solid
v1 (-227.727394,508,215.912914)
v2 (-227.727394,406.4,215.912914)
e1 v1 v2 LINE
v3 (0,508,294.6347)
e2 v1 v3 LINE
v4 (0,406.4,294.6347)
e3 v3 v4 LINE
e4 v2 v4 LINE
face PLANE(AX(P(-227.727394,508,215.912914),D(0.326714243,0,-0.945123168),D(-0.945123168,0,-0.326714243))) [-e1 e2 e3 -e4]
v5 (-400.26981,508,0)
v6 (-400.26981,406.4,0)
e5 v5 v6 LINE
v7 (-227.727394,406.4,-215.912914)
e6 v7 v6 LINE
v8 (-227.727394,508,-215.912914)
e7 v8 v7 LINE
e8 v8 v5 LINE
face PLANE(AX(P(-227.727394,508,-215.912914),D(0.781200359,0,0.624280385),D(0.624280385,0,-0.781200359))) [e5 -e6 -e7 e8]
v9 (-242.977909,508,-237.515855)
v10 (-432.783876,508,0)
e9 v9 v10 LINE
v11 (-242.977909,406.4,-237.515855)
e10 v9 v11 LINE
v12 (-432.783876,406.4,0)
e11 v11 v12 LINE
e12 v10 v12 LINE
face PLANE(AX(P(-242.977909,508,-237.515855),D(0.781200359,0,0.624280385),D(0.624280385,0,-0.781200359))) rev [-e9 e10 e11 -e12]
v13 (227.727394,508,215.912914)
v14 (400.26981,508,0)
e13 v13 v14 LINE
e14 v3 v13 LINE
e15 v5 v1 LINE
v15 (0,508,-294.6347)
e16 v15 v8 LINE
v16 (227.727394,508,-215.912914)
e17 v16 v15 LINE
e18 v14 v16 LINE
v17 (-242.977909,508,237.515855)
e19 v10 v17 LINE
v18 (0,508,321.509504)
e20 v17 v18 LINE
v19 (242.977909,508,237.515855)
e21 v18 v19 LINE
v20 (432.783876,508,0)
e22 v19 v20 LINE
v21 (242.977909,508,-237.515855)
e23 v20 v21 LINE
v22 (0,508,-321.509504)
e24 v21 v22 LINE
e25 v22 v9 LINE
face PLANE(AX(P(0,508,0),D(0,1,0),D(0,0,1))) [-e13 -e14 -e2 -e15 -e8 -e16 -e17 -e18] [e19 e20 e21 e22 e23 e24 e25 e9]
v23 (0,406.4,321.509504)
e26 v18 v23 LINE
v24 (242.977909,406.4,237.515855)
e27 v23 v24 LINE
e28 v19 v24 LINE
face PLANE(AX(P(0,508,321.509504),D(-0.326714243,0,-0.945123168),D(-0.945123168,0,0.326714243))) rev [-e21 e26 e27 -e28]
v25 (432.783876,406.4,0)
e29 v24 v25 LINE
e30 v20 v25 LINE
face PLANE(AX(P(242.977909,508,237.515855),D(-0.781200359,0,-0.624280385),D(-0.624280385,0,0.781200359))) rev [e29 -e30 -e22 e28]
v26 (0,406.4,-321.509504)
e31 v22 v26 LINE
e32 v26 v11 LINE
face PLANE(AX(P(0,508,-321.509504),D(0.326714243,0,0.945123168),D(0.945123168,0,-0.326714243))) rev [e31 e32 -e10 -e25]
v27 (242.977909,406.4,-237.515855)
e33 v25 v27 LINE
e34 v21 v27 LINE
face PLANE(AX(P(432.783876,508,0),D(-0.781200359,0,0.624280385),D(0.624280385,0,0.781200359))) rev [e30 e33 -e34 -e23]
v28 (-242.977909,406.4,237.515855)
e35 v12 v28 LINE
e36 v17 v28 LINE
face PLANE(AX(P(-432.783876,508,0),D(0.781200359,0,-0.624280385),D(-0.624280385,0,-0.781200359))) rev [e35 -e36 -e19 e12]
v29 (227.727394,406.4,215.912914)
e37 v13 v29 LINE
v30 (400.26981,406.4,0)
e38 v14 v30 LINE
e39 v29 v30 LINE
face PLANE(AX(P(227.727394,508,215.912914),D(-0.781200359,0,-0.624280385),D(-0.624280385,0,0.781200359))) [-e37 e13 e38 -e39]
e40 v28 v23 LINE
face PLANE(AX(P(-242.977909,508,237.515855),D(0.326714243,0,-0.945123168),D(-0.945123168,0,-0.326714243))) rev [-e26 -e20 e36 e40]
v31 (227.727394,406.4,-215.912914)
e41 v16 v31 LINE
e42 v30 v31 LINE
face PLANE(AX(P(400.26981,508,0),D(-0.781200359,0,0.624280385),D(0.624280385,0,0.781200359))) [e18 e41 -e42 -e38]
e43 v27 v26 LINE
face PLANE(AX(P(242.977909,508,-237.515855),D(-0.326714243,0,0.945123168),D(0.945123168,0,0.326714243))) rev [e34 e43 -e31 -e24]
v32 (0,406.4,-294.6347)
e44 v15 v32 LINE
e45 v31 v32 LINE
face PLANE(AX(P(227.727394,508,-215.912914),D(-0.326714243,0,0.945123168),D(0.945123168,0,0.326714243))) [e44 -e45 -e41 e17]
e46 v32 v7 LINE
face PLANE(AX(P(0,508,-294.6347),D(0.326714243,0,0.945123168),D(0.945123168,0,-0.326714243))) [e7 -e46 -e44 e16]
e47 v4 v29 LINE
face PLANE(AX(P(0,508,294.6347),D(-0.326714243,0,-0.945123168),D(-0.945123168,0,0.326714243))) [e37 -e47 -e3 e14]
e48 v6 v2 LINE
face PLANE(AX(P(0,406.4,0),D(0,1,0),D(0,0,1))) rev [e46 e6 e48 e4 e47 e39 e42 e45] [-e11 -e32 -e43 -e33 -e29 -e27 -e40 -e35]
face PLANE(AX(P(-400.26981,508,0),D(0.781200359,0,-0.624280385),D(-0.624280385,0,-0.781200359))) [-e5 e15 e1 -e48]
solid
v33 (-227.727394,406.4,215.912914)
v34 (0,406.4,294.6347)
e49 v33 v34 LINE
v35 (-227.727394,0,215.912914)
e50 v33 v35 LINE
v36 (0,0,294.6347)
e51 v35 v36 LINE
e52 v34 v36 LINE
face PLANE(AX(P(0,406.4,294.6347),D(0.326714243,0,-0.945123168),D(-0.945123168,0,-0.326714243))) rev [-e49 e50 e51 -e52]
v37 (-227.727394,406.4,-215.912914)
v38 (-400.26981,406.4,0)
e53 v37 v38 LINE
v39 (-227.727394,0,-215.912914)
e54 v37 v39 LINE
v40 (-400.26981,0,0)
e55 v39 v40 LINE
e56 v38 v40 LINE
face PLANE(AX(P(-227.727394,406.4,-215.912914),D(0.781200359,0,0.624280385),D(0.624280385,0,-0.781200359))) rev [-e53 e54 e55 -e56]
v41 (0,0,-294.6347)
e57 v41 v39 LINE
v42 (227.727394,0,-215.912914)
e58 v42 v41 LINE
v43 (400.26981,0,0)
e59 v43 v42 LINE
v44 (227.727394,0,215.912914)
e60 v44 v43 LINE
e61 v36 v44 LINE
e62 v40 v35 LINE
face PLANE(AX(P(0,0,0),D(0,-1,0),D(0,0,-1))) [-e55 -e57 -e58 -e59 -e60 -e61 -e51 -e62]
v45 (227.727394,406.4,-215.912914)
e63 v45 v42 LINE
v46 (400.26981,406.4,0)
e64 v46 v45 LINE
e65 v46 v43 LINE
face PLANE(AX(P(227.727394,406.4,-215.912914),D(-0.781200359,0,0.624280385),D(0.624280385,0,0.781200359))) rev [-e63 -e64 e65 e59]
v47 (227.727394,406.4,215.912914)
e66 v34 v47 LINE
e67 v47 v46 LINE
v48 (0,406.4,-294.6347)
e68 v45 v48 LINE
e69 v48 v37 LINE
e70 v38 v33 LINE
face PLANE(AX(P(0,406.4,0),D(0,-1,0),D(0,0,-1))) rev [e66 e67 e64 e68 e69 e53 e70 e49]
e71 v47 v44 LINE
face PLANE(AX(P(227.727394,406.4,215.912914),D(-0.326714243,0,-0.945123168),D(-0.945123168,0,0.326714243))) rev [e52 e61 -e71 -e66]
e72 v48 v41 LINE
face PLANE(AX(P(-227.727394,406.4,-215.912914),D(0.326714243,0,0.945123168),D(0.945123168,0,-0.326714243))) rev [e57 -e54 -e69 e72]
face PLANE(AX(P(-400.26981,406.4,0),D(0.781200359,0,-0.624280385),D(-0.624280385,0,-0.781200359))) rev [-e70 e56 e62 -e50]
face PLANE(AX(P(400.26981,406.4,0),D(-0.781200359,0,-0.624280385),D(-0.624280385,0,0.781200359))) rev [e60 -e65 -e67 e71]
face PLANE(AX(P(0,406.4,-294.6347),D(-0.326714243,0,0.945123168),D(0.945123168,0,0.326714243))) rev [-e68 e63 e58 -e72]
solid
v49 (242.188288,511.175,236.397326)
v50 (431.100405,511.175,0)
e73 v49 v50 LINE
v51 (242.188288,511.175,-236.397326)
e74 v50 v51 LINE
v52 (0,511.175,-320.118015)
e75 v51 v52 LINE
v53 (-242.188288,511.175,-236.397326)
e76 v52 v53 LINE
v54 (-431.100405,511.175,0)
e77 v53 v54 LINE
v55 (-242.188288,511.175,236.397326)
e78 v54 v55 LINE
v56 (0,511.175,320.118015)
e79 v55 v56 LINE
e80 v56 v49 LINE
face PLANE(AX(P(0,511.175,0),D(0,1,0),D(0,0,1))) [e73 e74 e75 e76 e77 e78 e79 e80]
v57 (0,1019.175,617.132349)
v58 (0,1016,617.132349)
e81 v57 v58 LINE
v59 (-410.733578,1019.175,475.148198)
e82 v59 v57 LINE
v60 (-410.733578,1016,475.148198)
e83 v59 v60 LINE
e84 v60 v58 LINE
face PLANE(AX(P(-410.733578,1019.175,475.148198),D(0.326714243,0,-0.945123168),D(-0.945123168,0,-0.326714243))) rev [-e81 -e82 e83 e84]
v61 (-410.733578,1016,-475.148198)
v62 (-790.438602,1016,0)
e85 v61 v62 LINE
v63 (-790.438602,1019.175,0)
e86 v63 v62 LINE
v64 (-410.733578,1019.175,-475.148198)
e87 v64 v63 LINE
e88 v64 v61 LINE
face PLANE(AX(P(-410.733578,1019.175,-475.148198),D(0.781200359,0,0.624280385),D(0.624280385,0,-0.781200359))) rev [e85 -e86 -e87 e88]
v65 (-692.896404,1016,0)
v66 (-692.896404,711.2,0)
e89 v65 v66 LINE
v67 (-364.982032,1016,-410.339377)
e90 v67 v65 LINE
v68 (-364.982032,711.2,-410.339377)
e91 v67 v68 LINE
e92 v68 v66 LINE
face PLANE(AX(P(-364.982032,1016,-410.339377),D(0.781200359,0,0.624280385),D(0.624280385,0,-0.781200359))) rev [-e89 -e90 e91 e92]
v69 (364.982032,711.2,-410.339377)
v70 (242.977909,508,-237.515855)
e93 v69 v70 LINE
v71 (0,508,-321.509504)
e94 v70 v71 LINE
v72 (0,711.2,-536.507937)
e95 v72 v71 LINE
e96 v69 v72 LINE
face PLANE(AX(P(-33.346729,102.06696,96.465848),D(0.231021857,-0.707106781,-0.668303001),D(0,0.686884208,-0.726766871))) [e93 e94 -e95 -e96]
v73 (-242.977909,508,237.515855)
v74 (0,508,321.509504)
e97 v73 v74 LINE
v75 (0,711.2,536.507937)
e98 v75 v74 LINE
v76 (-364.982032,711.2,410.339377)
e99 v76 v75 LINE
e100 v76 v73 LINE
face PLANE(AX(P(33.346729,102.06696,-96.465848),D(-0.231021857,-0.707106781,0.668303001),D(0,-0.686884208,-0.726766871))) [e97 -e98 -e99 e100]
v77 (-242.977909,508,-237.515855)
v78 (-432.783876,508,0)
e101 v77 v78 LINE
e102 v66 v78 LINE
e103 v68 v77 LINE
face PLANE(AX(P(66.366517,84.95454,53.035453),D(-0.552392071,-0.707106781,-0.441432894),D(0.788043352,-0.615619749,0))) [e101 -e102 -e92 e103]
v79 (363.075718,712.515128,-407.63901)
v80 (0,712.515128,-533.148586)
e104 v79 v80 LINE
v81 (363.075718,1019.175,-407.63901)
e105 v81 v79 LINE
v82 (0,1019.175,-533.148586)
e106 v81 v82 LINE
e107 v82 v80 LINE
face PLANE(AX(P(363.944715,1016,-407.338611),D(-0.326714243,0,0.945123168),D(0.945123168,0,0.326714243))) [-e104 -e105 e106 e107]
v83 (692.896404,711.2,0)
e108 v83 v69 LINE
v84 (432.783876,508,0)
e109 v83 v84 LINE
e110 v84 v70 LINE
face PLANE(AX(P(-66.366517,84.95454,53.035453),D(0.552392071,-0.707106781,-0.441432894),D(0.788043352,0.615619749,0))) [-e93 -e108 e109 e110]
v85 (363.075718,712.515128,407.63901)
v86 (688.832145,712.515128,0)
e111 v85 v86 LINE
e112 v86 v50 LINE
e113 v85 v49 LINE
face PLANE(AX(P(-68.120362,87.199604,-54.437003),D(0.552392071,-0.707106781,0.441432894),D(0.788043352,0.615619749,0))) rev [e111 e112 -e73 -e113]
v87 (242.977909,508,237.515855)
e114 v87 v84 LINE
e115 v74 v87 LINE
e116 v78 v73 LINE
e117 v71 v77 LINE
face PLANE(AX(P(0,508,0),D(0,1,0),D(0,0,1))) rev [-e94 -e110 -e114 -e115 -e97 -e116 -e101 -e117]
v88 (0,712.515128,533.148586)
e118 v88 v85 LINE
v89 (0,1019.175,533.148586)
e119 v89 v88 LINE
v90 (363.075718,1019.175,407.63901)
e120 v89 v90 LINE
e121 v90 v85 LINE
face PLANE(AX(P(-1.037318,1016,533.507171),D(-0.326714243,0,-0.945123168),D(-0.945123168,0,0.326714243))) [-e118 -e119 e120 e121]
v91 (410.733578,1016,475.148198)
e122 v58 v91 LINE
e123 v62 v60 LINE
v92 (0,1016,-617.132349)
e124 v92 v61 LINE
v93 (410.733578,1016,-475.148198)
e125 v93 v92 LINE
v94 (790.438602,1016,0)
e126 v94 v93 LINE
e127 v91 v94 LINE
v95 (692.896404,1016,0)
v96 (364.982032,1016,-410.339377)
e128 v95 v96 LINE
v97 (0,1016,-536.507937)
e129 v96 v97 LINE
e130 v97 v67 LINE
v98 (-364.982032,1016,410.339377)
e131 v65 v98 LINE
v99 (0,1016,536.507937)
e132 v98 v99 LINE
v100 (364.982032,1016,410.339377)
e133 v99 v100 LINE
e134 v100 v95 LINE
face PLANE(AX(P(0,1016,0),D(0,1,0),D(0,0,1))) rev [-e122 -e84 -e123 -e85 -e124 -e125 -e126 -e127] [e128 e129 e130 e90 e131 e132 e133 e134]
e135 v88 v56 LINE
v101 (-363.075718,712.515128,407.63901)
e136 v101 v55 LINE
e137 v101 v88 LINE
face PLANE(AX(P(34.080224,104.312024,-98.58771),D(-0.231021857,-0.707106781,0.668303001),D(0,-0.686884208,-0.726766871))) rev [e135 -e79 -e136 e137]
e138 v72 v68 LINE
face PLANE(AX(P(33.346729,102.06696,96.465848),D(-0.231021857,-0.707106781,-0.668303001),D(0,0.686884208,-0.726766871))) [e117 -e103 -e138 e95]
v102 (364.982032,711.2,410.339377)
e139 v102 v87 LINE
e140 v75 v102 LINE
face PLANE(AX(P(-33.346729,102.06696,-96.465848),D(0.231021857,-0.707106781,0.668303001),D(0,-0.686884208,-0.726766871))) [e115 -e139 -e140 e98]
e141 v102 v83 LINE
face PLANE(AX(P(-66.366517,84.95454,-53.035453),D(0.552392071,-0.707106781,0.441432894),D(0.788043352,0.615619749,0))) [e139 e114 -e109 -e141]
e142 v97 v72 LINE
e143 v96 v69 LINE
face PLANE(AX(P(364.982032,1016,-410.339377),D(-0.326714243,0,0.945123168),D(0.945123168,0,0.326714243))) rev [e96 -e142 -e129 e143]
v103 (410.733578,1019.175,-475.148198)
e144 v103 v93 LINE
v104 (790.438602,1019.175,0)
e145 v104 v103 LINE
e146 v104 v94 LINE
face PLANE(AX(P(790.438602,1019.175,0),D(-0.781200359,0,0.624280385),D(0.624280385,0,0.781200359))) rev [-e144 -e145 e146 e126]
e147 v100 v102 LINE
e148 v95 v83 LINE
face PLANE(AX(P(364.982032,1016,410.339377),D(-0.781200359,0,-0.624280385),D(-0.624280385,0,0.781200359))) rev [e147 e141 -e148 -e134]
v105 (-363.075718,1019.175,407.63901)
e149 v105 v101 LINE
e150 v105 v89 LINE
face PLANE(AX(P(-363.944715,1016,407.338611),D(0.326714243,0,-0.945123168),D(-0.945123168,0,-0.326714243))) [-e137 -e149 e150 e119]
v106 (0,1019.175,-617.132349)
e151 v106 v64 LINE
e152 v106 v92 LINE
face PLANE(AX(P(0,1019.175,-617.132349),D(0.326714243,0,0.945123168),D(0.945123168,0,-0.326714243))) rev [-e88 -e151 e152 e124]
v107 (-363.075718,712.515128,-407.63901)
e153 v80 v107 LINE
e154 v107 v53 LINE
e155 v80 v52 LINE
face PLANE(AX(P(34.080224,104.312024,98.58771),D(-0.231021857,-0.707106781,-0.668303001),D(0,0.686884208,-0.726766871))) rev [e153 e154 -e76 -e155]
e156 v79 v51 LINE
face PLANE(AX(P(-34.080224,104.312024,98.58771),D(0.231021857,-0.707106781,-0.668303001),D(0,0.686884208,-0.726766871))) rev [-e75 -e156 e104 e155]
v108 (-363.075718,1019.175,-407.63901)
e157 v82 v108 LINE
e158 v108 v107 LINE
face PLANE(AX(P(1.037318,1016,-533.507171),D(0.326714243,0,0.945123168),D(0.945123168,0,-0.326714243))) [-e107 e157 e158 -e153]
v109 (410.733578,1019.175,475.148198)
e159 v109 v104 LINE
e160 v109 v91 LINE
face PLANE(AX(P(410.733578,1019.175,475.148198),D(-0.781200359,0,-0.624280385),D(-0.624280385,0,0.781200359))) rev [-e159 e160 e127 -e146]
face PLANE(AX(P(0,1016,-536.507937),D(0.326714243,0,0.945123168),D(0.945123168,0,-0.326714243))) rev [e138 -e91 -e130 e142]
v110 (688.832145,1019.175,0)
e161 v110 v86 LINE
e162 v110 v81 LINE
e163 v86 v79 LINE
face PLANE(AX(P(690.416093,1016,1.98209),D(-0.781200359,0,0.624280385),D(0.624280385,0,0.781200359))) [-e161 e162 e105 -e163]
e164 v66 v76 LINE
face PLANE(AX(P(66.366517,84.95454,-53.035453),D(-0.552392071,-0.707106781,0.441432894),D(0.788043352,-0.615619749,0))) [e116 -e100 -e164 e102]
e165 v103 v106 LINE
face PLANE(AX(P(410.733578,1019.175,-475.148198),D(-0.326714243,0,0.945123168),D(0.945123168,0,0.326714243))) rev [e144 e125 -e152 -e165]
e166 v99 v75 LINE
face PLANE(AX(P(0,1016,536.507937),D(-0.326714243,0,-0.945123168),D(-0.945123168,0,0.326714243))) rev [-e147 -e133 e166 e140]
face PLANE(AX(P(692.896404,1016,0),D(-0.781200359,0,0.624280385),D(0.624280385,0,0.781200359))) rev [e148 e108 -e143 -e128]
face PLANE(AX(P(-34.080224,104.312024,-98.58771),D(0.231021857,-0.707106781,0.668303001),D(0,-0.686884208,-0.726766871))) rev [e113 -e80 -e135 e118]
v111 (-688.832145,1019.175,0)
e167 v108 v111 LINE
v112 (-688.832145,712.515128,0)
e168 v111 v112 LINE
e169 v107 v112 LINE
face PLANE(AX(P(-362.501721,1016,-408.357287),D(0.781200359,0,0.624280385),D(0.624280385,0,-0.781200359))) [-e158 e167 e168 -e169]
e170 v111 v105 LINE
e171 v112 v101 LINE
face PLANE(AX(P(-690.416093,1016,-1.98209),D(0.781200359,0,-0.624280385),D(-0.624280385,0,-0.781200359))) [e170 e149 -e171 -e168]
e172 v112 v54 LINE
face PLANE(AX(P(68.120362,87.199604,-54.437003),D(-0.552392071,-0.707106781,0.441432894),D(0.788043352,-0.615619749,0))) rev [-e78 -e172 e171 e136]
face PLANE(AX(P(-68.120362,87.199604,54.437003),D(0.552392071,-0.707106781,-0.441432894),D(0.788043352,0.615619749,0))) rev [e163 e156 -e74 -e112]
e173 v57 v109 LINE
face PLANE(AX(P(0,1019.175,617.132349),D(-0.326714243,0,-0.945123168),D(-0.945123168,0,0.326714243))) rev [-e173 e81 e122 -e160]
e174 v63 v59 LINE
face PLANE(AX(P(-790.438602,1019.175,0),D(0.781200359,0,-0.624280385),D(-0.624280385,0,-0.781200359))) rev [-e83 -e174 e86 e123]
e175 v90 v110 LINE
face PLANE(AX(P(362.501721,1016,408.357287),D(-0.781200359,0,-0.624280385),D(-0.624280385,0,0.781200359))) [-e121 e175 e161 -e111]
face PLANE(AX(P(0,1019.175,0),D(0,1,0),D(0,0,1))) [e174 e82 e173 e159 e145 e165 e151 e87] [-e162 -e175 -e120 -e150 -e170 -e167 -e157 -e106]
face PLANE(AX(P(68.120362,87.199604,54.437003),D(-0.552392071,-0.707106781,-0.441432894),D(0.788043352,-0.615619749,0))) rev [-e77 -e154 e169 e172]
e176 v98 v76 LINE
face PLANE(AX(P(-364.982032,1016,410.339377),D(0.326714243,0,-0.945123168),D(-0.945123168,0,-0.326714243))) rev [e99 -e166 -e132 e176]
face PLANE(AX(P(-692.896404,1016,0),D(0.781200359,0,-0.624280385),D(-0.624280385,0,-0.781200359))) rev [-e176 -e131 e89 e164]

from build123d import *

# Parameters (mm, degrees)
BOSS_EXTRUDE1_DEPTH = 406.4
BOSS_EXTRUDE2_DEPTH = 101.6
BOSS_EXTRUDE3_DEPTH = 304.8
BOSS_EXTRUDE4_DEPTH = 3.175
SHELL3_START        = 712.515128061
SHELL3_DEPTH        = 306.659871939


with BuildPart() as part:
    # Sketch2 → Boss-Extrude1 (new body)
    with BuildSketch(Plane(origin=(0, 0, 0), x_dir=(1, 0, 0), z_dir=(0, 1, 0))):
        Polygon((-227.727393818, 215.912914456), (-400.269809967, 0), (-227.727393818, -215.912914456), (0, -294.634699703), (227.727393818, -215.912914456), (400.269809967, 0), (227.727393818, 215.912914456), (0, 294.634699703), align=None)
    extrude(amount=BOSS_EXTRUDE1_DEPTH)


with BuildPart() as body_2:
    # Sketch3 → Boss-Extrude2 (new body)
    with BuildSketch(Plane(origin=(0, 406.4, 0), x_dir=(1, 0, 0), z_dir=(0, 1, 0))):
        Polygon((0, 321.509503803), (-242.977909201, 237.515854786), (-432.783875933, 0), (-242.977909201, -237.515854786), (0, -321.509503803), (242.977909201, -237.515854786), (432.783875933, 0), (242.977909201, 237.515854786), align=None)
        Polygon((0, 294.634699703), (-227.727393818, 215.912914456), (-400.269809967, 0), (-227.727393818, -215.912914456), (0, -294.634699703), (227.727393818, -215.912914456), (400.269809967, 0), (227.727393818, 215.912914456), align=None, mode=Mode.SUBTRACT)
    extrude(amount=BOSS_EXTRUDE2_DEPTH)


with BuildPart() as body_3:
    # Sketch5 → Loft1 section 0
    with BuildSketch(Plane(origin=(0, 711.2, 0), x_dir=(1, 0, 0), z_dir=(0, 1, 0))):
        with BuildLine():
            Line((0, 536.5079366), (-364.98203226, 410.339377425))
            Line((-364.98203226, 410.339377425), (-692.896403665, 0))
            Line((-692.896403665, 0), (-364.98203226, -410.339377425))
            Line((-364.98203226, -410.339377425), (0, -536.5079366))
            Line((0, -536.5079366), (364.98203226, -410.339377425))
            Line((364.98203226, -410.339377425), (692.896403665, 0))
            Line((692.896403665, 0), (364.98203226, 410.339377425))
            Line((364.98203226, 410.339377425), (0, 536.5079366))
        make_face()
    # Sketch4 → Loft1 section 1
    with BuildSketch(Plane(origin=(0, 508, 0), x_dir=(1, 0, 0), z_dir=(0, 1, 0))):
        with BuildLine():
            Line((-242.977909201, 237.515854786), (-432.783875933, 0))
            Line((-432.783875933, 0), (-242.977909201, -237.515854786))
            Line((-242.977909201, -237.515854786), (0, -321.509503803))
            Line((0, -321.509503803), (242.977909201, -237.515854786))
            Line((242.977909201, -237.515854786), (432.783875933, 0))
            Line((432.783875933, 0), (242.977909201, 237.515854786))
            Line((242.977909201, 237.515854786), (0, 321.509503803))
            Line((0, 321.509503803), (-242.977909201, 237.515854786))
        make_face()
    loft()

    # Sketch6 → Boss-Extrude3 (add)
    with BuildSketch(Plane(origin=(0, 711.2, 0), x_dir=(1, 0, 0), z_dir=(0, 1, 0))):
        Polygon((-364.98203226, -410.339377425), (0, -536.5079366), (364.98203226, -410.339377425), (692.896403665, 0), (364.98203226, 410.339377425), (0, 536.5079366), (-364.98203226, 410.339377425), (-692.896403665, 0), align=None)
    extrude(amount=BOSS_EXTRUDE3_DEPTH)

    # Sketch7 → Boss-Extrude4 (add)
    with BuildSketch(Plane(origin=(0, 1016, 0), x_dir=(1, 0, 0), z_dir=(0, 1, 0))):
        Polygon((-790.438601564, 0), (-410.733578407, -475.148198415), (0, -617.132348899), (410.733578407, -475.148198415), (790.438601564, 0), (410.733578407, 475.148198415), (0, 617.132348899), (-410.733578407, 475.148198415), align=None)
    extrude(amount=BOSS_EXTRUDE4_DEPTH)

    # Shell3: read off the stored shape, not the designer's step
    # Shell3 outline → Shell3 (cut)
    with BuildSketch(Plane(origin=(0, 0, 0), x_dir=(1, 0, 0), z_dir=(0, 1, 0)).offset(SHELL3_START)):
        Polygon((-688.832145419, 0), (-363.075717837, -407.639009884), (0, -533.148586088), (363.075717837, -407.639009884), (688.832145419, 0), (363.075717837, 407.639009884), (0, 533.148586088), (-363.075717837, 407.639009884), align=None)
    extrude(amount=SHELL3_DEPTH, mode=Mode.SUBTRACT)

    # Shell3 2: loft between two sections, ruled curve by curve
    shell3_2_from = [
        Edge.make_line((-242.188287913, 511.175, -236.397325927), (-431.100405047, 511.175, 0)),
        Edge.make_line((-431.100405047, 511.175, 0), (-242.188287913, 511.175, 236.397325927)),
        Edge.make_line((0, 511.175, -320.11801526), (-242.188287913, 511.175, -236.397325927)),
        Edge.make_line((242.188287913, 511.175, -236.397325927), (0, 511.175, -320.11801526)),
        Edge.make_line((431.100405047, 511.175, 0), (242.188287913, 511.175, -236.397325927)),
        Edge.make_line((242.188287913, 511.175, 236.397325927), (431.100405047, 511.175, 0)),
        Edge.make_line((0, 511.175, 320.11801526), (242.188287913, 511.175, 236.397325927)),
        Edge.make_line((-242.188287913, 511.175, 236.397325927), (0, 511.175, 320.11801526)),
    ]
    shell3_2_to = [
        Edge.make_line((-363.075717837, 712.515128061, -407.639009884), (-688.832145419, 712.515128061, 0)),
        Edge.make_line((-688.832145419, 712.515128061, 0), (-363.075717837, 712.515128061, 407.639009884)),
        Edge.make_line((0, 712.515128061, -533.148586088), (-363.075717837, 712.515128061, -407.639009884)),
        Edge.make_line((363.075717837, 712.515128061, -407.639009884), (0, 712.515128061, -533.148586088)),
        Edge.make_line((688.832145419, 712.515128061, 0), (363.075717837, 712.515128061, -407.639009884)),
        Edge.make_line((363.075717837, 712.515128061, 407.639009884), (688.832145419, 712.515128061, 0)),
        Edge.make_line((0, 712.515128061, 533.148586088), (363.075717837, 712.515128061, 407.639009884)),
        Edge.make_line((-363.075717837, 712.515128061, 407.639009884), (0, 712.515128061, 533.148586088)),
    ]
    shell3_2 = Solid(Shell([*[Face.make_surface_from_curves(shell3_2_from[k], shell3_2_to[k]) for k in range(8)], Face(Wire(shell3_2_from)), Face(Wire(shell3_2_to))]))
    add(shell3_2, mode=Mode.SUBTRACT)


solid = Compound([part.part, body_2.part, body_3.part])
